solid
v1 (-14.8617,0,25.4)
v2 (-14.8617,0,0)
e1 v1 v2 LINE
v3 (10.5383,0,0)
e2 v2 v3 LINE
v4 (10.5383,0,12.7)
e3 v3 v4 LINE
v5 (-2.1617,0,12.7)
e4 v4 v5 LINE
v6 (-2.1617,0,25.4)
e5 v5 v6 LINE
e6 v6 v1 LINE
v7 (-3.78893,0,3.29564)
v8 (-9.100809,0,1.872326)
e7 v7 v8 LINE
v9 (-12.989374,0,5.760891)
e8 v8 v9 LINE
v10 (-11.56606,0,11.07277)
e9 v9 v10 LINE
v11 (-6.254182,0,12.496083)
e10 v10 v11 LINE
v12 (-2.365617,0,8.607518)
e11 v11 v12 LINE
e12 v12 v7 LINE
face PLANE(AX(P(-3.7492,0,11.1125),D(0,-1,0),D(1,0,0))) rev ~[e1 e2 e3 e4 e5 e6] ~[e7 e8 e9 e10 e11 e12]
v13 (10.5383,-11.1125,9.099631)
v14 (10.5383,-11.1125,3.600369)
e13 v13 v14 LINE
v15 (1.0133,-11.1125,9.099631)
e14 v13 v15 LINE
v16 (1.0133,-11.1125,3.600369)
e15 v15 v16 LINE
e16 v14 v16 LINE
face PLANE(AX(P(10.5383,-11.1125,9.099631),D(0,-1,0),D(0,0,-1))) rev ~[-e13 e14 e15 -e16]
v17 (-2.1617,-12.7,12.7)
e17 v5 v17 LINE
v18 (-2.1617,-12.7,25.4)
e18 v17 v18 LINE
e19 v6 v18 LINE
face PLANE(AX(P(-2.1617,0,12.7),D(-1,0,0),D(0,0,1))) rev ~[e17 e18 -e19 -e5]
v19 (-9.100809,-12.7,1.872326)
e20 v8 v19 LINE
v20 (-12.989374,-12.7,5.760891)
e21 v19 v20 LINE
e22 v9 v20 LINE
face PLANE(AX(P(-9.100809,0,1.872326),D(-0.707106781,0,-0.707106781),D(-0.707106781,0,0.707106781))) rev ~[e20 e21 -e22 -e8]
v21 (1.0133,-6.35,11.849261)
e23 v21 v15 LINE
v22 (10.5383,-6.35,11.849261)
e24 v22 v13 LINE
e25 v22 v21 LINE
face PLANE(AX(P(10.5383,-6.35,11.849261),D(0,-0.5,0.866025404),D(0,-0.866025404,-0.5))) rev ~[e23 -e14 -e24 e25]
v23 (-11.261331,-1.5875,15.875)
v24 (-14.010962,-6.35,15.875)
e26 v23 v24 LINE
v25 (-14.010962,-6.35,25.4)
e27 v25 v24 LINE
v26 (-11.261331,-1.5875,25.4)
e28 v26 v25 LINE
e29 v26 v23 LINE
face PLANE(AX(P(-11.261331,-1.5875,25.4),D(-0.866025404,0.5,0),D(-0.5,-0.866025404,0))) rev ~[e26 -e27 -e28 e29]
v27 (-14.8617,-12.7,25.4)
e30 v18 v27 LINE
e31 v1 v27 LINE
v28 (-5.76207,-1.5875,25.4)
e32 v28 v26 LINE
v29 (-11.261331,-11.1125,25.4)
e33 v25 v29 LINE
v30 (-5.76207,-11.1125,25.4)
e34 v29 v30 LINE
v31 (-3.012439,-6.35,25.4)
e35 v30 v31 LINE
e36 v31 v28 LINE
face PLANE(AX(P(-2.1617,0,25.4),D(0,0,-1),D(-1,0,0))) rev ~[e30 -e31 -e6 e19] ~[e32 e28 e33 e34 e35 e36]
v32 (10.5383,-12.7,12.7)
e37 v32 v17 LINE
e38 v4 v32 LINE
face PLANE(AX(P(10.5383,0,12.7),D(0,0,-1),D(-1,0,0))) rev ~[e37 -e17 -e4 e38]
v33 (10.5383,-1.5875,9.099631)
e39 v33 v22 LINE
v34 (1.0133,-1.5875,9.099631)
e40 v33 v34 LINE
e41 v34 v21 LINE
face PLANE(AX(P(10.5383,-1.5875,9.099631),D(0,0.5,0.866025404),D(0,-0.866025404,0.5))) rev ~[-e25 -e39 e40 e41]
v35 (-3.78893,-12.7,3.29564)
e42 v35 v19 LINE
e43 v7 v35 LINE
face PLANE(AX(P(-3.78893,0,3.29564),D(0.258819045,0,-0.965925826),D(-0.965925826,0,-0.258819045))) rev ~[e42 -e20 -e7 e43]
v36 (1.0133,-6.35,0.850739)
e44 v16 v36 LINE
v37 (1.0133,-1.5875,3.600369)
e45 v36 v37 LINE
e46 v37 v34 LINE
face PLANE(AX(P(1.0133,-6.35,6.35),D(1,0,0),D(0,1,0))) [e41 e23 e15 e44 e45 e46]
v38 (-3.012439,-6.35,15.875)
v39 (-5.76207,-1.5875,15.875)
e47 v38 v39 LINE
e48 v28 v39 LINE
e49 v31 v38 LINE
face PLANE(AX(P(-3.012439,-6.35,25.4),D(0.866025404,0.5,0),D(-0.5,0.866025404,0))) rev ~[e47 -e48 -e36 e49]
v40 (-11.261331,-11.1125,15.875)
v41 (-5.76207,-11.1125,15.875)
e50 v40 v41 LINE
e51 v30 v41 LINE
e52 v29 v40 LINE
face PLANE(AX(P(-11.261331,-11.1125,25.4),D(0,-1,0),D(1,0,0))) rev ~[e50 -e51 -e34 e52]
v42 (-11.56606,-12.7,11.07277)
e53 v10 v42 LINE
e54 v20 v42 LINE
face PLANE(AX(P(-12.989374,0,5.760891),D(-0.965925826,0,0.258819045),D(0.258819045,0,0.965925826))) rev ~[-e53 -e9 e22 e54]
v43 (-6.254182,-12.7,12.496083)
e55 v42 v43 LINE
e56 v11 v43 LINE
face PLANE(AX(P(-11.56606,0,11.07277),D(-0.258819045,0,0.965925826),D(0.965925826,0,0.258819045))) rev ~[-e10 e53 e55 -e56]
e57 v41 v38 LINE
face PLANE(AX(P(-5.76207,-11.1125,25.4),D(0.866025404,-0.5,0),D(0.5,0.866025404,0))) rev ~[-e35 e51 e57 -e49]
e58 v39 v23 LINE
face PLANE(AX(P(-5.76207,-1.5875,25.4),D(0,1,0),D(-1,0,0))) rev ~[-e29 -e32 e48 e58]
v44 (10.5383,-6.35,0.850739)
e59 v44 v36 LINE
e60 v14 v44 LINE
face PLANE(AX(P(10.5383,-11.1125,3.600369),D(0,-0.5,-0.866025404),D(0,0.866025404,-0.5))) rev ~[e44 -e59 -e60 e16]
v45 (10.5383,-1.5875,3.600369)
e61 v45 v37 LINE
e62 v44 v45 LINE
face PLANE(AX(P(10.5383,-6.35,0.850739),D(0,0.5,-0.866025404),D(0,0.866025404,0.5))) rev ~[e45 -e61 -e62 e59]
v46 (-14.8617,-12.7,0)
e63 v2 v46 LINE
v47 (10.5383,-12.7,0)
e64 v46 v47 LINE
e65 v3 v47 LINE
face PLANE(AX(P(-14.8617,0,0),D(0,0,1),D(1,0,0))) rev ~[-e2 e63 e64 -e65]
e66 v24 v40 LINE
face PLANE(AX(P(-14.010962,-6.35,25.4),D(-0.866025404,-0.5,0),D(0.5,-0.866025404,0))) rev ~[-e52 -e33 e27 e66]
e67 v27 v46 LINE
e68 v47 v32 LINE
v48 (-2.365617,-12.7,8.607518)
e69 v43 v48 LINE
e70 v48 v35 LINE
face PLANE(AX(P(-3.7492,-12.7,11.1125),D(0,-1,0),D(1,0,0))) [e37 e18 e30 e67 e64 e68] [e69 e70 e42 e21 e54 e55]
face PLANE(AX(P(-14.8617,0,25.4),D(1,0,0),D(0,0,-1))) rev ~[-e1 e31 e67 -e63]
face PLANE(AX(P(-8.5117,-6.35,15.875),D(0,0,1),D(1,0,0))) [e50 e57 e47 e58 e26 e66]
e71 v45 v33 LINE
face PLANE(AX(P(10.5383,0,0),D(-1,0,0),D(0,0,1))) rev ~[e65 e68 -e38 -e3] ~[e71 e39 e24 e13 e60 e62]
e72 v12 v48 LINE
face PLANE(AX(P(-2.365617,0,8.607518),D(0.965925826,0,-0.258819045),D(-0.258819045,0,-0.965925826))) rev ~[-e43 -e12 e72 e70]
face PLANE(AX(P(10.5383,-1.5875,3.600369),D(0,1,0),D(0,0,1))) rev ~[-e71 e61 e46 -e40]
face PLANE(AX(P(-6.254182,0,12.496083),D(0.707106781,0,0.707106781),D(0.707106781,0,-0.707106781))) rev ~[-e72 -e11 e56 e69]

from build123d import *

# Parameters (mm, degrees)
F1_DEPTH = 12.7
F3_DEPTH = 9.525
F5_DEPTH = 9.525


# Not quite as in the source:
# - a feature names something its author has since deleted; it is built from what else it names


with BuildPart() as f1:
    # F0 (on Front) → F1 (new body)
    with BuildSketch(Plane.XZ):
        Polygon((-2.1617002284, 25.4), (-14.8617002284, 25.4), (-14.8617002284, 0), (10.5382997716, 0), (10.5382997716, 12.7), (-2.1617002284, 12.7), align=None)
        Polygon((-6.2541817694, 12.4960834256), (-2.3656168028, 8.6075184589), (-3.7889303648, 3.2956399302), (-9.1008088936, 1.8723263681), (-12.9893738602, 5.7608913348), (-11.5660602982, 11.0727698635), align=None, mode=Mode.SUBTRACT)
    extrude(amount=F1_DEPTH)

    # F2 (on face) → F3 (cut)
    with BuildSketch(Plane.XY.offset(25.4)):
        Polygon((-5.7620695714, -11.1125), (-3.0124389143, -6.35), (-5.7620695714, -1.5875), (-11.2613308854, -1.5875), (-14.0109615424, -6.35), (-11.2613308854, -11.1125), align=None)
    extrude(amount=-F3_DEPTH, mode=Mode.SUBTRACT)

    # F4 (on face) → F5 (cut)
    with BuildSketch(Plane.YZ.offset(10.5382997716)):
        Polygon((-6.35, 0.850738686), (-1.5875, 3.600369343), (-1.5875, 9.099630657), (-6.35, 11.849261314), (-11.1125, 9.099630657), (-11.1125, 3.600369343), align=None)
    extrude(amount=-F5_DEPTH, mode=Mode.SUBTRACT)


solid = f1.part
